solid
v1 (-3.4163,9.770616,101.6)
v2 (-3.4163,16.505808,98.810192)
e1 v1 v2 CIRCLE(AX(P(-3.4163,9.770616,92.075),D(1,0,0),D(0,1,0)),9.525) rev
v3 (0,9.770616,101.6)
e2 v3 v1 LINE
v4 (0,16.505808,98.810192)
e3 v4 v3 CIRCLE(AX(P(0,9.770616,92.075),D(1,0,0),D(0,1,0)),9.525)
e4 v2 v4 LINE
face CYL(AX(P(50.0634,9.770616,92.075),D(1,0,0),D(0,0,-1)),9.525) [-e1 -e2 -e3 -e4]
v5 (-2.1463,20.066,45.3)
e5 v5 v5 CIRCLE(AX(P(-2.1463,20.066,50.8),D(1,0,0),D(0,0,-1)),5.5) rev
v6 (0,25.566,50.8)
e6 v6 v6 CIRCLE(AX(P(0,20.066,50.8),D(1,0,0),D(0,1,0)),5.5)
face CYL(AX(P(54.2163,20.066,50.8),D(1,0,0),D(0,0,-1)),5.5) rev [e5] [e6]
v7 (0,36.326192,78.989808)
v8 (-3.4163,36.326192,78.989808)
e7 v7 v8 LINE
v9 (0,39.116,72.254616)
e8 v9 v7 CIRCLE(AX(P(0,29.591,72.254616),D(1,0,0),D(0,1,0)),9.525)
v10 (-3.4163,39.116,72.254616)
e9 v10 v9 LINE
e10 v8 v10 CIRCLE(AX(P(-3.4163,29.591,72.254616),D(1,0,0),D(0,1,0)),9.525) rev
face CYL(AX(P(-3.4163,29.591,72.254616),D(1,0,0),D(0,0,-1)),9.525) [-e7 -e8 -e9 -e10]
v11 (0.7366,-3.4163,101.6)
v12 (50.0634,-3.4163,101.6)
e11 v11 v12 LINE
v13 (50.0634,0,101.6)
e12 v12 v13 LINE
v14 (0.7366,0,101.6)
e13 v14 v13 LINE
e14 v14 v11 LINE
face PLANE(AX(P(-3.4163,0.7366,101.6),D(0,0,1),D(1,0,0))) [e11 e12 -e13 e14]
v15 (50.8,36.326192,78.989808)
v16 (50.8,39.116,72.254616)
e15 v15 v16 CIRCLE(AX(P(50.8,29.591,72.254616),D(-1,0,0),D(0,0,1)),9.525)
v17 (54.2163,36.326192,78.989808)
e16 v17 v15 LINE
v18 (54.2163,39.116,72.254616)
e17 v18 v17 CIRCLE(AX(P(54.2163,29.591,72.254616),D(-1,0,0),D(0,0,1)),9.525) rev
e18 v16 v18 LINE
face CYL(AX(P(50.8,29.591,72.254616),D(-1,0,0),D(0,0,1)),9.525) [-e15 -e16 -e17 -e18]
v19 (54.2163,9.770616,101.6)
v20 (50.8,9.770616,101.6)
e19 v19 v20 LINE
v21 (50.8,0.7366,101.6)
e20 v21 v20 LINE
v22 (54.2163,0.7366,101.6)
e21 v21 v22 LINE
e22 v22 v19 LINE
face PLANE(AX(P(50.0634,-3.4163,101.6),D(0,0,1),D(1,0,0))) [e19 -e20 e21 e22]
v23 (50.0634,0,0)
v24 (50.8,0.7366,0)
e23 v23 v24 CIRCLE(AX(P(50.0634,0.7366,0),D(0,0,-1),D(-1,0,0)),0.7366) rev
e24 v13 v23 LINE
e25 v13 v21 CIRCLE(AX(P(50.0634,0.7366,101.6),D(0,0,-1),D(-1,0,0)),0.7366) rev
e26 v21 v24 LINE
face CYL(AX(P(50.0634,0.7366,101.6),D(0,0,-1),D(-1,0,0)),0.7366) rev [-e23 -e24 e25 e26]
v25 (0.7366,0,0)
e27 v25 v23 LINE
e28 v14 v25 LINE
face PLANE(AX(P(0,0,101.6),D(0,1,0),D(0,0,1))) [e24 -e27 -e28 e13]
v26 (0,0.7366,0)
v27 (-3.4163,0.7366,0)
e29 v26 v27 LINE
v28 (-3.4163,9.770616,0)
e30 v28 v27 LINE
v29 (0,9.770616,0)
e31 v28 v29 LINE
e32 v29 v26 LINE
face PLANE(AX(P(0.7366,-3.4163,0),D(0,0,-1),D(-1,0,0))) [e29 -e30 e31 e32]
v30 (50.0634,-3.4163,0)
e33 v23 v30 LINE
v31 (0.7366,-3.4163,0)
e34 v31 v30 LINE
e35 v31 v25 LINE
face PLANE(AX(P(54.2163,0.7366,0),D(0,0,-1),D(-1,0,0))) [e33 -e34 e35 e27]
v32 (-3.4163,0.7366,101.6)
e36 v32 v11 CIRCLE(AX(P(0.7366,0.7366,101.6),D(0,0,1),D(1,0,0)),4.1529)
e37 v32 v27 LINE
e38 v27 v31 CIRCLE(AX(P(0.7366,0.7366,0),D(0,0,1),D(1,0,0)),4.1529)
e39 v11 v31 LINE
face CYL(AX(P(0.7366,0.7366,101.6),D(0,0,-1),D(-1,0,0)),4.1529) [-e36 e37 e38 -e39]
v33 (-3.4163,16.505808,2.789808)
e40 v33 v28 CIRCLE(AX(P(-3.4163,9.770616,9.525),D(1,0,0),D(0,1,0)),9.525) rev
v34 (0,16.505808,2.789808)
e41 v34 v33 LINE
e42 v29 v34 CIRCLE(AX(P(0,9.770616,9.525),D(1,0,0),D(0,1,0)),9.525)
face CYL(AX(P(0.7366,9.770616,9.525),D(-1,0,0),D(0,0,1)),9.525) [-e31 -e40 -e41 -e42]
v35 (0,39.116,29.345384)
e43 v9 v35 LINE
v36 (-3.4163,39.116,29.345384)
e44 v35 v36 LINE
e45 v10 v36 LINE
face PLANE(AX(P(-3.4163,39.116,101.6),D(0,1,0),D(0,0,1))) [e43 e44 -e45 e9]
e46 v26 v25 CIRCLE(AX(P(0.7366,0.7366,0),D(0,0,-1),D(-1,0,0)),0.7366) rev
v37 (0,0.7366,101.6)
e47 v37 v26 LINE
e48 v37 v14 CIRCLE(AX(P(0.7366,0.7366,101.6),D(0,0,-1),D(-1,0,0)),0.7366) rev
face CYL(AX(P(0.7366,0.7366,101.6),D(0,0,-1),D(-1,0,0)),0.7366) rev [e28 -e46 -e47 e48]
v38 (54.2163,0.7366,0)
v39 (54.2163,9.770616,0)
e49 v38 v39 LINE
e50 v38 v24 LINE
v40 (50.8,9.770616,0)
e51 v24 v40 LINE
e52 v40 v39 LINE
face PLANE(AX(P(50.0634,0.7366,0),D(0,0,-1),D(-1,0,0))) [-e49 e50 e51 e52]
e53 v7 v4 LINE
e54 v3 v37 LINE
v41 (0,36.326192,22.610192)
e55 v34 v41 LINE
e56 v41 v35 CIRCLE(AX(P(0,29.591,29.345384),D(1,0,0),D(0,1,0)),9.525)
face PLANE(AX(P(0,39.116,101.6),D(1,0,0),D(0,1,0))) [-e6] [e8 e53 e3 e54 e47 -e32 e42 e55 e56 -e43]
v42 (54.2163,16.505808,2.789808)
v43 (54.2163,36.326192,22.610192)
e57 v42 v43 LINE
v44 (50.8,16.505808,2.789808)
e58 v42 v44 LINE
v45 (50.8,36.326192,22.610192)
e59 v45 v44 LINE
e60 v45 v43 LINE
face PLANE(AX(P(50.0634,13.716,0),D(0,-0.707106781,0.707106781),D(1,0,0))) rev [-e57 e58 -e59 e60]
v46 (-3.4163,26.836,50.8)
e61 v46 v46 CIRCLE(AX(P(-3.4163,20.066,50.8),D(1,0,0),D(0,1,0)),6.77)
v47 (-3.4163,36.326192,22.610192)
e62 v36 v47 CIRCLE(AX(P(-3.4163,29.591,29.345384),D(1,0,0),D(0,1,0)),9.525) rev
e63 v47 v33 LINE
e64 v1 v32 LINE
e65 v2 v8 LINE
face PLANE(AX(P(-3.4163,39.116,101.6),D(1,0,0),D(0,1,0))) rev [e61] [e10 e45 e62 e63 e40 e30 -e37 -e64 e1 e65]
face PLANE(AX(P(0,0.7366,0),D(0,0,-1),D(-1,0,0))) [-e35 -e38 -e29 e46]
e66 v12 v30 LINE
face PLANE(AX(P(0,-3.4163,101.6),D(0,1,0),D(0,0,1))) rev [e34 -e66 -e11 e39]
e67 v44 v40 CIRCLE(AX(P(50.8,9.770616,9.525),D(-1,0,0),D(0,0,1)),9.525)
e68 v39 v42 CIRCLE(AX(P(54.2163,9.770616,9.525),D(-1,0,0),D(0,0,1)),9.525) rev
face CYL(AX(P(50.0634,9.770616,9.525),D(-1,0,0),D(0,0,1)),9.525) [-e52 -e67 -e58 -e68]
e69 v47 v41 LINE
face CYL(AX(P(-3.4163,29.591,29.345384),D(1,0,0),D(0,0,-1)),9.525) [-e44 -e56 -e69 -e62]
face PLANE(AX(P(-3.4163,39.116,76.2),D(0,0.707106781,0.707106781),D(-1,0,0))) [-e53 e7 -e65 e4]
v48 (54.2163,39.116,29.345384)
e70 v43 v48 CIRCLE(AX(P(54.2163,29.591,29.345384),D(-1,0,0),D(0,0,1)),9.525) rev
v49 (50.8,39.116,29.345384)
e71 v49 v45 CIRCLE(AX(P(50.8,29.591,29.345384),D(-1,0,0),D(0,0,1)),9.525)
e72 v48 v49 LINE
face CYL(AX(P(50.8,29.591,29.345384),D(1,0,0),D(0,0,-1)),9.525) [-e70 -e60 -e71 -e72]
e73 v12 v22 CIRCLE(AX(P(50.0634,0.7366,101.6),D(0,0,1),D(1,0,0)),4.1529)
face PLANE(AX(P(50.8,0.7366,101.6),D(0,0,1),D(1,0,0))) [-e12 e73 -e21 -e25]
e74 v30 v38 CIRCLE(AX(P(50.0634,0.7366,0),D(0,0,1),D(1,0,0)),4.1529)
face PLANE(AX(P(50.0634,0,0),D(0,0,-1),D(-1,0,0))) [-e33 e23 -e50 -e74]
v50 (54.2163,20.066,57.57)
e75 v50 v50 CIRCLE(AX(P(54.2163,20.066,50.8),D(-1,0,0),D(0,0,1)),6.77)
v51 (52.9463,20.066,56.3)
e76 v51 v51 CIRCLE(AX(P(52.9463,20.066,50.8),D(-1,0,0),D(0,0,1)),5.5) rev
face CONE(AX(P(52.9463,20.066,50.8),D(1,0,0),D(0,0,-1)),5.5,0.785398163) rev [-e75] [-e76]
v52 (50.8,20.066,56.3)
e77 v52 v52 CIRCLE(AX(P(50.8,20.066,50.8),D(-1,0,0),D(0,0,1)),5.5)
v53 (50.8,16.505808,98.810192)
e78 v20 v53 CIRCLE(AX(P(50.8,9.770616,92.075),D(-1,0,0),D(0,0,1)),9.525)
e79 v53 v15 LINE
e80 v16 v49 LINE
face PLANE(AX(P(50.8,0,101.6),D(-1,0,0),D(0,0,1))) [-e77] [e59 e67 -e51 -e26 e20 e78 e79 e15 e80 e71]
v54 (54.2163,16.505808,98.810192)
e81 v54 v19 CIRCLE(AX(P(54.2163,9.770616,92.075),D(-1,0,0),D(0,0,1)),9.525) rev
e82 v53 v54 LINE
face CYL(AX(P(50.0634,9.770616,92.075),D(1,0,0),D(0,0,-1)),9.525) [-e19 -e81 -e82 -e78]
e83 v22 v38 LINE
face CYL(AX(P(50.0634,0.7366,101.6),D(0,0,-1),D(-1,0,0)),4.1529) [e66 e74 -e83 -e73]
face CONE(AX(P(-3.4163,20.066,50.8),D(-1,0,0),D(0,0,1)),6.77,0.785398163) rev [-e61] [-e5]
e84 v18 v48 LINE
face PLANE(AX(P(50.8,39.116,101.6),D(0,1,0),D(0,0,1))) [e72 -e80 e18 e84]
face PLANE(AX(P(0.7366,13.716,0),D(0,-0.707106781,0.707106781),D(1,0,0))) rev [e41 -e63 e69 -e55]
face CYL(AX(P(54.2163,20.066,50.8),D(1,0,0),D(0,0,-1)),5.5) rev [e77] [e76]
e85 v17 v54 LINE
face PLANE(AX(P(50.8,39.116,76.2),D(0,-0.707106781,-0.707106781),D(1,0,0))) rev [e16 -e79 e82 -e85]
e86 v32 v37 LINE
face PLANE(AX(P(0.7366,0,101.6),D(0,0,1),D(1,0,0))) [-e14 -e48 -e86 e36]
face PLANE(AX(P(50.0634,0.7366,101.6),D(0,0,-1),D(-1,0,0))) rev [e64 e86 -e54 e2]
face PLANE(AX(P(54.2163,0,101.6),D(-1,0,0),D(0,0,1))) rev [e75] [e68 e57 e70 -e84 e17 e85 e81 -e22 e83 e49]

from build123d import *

# Parameters (mm, degrees)
BASE_FLANGE1_DEPTH        = 101.6
CHAMFER1_SIZE             = 25.4
FILLET1_R                 = 9.525
M10_CLEARANCE_HOLE1_D     = 11
M10_CLEARANCE_HOLE1_DEPTH = 57.658
M10_CLEARANCE_HOLE1_TIP   = 3.304733405
CHAMFER2_SIZE             = 1.27


# Sheet-metal steps are written as plain solids
with BuildPart() as part:
    # Sketch1 → Base-Flange1 (new body)
    with BuildSketch(Plane.XY):
        with BuildLine():
            Line((0, 39.116), (0, 0.7366))
            ThreePointArc((0, 0.7366), (0.215745145, 0.215745145), (0.7366, 0))
            Line((0.7366, 0), (50.0634, 0))
            ThreePointArc((50.0634, 0), (50.584254855, 0.215745145), (50.8, 0.7366))
            Line((50.8, 0.7366), (50.8, 39.116))
            Line((50.8, 39.116), (54.2163, 39.116))
            Line((54.2163, 39.116), (54.2163, 0.7366))
            ThreePointArc((54.2163, 0.7366), (52.999943752, -2.199943752), (50.0634, -3.4163))
            Line((50.0634, -3.4163), (0.7366, -3.4163))
            ThreePointArc((0.7366, -3.4163), (-2.199943752, -2.199943752), (-3.4163, 0.7366))
            Line((-3.4163, 0.7366), (-3.4163, 39.116))
            Line((-3.4163, 39.116), (0, 39.116))
        make_face()
    extrude(amount=BASE_FLANGE1_DEPTH)

    # Chamfer1
    chamfer1_edges = [part.edges().sort_by_distance(p)[0] for p in [
        (-1.70815, 39.116, 0),
        (52.50815, 39.116, 0),
        (-1.70815, 39.116, 101.6),
        (52.50815, 39.116, 101.6),
    ]]
    chamfer(chamfer1_edges, length=CHAMFER1_SIZE)

    # Fillet1
    fillet1_edges = [part.edges().sort_by_distance(p)[0] for p in [
        (52.50815, 13.716, 0),
        (52.50815, 39.116, 76.2),
        (52.50815, 39.116, 25.4),
        (52.50815, 13.716, 101.6),
        (-1.70815, 13.716, 0),
        (-1.70815, 39.116, 76.2),
        (-1.70815, 39.116, 25.4),
        (-1.70815, 13.716, 101.6),
    ]]
    fillet(fillet1_edges, radius=FILLET1_R)

    # M10 Clearance Hole1
    with Locations(Plane(origin=(54.2163, 0, 0), x_dir=(0, 0, -1), z_dir=(1, 0, 0))):
        with Locations((-50.8, 20.066)):
            Hole(M10_CLEARANCE_HOLE1_D / 2, depth=M10_CLEARANCE_HOLE1_DEPTH)
            with Locations((0, 0, -(M10_CLEARANCE_HOLE1_DEPTH + M10_CLEARANCE_HOLE1_TIP / 2))):  # 118° drill point
                Cone(0, M10_CLEARANCE_HOLE1_D / 2, M10_CLEARANCE_HOLE1_TIP, mode=Mode.SUBTRACT)

    # Chamfer2
    chamfer2_edges = [part.edges().sort_by_distance(p)[0] for p in [
        (-3.4163, 20.066, 45.3),
        (54.2163, 20.066, 45.3),
    ]]
    chamfer(chamfer2_edges, length=CHAMFER2_SIZE)


solid = part.part
